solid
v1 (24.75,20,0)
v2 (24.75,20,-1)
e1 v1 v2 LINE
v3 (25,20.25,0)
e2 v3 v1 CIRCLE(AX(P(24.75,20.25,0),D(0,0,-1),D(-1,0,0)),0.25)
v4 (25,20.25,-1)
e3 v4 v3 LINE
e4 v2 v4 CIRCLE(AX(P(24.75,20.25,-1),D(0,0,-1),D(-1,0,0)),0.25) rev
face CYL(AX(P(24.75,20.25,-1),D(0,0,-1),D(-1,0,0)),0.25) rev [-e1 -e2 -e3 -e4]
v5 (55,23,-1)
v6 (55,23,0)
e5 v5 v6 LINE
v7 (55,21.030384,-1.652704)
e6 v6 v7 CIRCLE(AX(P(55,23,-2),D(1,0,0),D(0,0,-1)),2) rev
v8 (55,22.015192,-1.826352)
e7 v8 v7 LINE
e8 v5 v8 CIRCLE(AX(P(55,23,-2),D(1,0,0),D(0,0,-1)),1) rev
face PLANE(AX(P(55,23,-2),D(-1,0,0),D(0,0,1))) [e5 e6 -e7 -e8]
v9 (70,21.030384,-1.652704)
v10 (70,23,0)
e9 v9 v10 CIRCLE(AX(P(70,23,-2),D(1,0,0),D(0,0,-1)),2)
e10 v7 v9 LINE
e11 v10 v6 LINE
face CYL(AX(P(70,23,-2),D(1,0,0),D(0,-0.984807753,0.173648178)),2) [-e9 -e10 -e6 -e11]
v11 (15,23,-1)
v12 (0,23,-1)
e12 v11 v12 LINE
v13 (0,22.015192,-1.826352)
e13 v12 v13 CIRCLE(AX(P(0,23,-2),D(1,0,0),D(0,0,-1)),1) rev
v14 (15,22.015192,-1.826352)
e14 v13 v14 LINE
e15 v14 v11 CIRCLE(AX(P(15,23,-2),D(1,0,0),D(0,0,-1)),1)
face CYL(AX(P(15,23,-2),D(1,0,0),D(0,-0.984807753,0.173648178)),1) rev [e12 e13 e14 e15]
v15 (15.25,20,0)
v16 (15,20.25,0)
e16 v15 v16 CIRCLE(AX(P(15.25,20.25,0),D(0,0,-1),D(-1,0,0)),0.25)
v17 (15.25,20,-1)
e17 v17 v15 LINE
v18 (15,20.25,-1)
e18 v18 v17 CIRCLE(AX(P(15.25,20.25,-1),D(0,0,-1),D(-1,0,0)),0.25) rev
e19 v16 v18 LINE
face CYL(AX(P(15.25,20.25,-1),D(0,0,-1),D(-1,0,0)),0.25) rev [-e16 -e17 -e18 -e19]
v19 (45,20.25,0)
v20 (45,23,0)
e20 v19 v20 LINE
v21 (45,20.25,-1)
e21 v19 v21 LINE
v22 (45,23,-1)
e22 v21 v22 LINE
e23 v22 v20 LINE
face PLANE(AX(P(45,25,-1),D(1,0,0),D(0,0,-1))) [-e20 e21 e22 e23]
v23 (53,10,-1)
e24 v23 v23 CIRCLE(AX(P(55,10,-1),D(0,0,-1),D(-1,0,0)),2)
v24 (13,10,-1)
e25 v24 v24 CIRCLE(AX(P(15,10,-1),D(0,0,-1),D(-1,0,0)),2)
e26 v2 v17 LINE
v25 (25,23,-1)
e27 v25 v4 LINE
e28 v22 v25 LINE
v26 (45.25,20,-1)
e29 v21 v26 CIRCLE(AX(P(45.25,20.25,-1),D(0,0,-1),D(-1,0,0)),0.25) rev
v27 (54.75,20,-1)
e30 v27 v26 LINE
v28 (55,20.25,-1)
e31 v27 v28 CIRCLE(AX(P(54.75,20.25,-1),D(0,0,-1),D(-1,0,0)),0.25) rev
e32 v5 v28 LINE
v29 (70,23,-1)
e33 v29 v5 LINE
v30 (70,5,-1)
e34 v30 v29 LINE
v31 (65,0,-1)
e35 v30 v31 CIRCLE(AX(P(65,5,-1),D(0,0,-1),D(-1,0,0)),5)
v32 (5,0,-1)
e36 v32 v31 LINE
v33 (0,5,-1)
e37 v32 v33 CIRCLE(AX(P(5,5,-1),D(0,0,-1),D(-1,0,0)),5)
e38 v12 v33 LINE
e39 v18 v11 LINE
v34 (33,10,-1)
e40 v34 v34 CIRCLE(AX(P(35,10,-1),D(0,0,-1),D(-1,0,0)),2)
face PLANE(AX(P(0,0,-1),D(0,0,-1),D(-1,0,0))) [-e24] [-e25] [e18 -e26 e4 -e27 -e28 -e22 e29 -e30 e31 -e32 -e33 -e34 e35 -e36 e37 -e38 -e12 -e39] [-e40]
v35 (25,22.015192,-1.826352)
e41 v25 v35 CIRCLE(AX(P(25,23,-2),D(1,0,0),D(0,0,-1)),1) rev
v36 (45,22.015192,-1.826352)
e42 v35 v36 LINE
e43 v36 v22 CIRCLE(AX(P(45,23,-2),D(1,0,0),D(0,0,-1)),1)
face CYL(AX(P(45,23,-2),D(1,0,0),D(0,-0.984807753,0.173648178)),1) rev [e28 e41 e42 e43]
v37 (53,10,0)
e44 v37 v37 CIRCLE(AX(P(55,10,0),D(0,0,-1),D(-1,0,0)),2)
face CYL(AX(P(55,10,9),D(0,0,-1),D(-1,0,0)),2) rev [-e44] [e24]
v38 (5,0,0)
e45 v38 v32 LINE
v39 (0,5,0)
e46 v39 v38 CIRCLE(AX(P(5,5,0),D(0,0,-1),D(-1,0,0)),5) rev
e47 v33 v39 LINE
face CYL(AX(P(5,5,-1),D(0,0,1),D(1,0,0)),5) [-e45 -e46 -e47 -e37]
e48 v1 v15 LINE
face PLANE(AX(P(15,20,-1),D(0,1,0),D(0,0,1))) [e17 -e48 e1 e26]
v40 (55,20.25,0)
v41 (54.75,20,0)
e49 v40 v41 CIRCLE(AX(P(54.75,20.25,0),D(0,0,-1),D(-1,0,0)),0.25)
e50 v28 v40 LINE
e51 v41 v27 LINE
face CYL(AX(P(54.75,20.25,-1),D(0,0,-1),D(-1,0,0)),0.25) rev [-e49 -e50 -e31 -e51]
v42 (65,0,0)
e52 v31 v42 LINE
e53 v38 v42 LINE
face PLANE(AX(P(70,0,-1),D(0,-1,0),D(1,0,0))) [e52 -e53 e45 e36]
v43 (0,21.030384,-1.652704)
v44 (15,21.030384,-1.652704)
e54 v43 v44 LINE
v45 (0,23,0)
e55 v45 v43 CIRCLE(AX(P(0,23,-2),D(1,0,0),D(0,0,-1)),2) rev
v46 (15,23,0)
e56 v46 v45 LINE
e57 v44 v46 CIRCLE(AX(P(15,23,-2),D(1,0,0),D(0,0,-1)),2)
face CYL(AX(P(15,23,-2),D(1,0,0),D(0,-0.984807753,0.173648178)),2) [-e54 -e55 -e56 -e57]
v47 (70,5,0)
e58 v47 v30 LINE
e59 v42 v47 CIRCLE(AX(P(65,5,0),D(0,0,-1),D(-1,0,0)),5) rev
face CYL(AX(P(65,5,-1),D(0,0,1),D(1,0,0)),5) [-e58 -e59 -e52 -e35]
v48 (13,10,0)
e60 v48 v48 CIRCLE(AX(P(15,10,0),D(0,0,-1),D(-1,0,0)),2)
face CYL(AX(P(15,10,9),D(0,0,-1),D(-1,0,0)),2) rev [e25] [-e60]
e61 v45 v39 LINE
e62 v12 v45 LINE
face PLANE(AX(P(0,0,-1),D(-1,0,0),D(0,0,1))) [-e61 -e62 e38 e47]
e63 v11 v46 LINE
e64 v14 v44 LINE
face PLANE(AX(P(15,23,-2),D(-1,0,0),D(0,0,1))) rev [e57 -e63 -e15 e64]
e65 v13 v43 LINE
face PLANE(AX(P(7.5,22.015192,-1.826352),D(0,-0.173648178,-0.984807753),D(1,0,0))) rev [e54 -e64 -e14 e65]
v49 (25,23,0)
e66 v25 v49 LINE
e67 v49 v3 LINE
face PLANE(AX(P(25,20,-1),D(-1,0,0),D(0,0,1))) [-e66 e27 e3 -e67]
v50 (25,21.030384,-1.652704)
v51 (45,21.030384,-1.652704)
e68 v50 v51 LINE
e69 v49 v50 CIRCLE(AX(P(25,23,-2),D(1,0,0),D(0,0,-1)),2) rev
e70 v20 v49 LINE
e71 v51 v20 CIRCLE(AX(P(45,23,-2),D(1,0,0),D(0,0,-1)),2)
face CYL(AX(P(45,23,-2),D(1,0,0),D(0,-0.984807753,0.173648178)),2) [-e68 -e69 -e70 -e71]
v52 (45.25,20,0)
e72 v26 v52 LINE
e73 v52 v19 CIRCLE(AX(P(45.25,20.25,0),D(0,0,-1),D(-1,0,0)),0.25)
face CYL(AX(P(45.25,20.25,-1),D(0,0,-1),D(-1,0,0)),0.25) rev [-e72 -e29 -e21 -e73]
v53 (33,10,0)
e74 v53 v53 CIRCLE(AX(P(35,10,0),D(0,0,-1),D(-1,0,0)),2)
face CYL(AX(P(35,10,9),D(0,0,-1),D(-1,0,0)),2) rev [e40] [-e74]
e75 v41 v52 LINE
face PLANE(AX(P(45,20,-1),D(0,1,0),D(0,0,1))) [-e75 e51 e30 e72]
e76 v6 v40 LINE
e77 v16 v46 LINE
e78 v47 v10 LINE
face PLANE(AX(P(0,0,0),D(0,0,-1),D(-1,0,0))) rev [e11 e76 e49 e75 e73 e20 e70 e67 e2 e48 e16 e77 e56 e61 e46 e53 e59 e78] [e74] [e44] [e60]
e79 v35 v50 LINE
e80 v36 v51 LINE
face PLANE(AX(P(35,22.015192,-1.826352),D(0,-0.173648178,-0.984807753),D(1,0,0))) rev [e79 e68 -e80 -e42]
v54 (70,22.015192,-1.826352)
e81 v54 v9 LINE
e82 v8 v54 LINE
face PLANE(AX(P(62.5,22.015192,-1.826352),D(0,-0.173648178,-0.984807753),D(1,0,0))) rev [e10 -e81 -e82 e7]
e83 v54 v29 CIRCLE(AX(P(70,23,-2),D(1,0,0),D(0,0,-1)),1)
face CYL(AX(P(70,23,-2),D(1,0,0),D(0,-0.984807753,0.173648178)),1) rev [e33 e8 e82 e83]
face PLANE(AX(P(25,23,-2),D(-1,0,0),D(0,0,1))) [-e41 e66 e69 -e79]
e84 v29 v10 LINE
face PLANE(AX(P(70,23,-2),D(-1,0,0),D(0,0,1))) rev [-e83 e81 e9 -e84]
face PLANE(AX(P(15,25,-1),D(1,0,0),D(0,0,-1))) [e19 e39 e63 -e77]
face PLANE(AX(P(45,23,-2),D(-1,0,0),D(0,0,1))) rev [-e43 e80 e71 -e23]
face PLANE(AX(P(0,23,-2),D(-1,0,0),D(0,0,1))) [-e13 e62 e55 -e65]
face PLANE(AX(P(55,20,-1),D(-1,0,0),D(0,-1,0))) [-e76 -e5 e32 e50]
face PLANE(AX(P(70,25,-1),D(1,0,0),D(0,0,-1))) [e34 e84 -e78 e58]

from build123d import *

# Parameters (mm, degrees)
SM_BASE_FLANGE_1_DEPTH = 1
OTHER_1_DEPTH          = 70
OTHER_START            = 25
OTHER_1_2_DEPTH        = 20
OTHER_1_3_DEPTH        = 15
OTHER_START_2          = 55
OTHER_1_4_DEPTH        = 15
SKETCH_12_R            = 2
CUT_EXTRUDE_1_DEPTH    = 10
OTHER_START_3          = -1
OTHER_1_5_DEPTH        = 1
FILLET_1_R             = 0.25
FILLET_2_R             = 5


# Read off the part's stored shape, not the designer's step: 햄1, 코너 자르기1
# Sheet-metal steps are written as plain solids
with BuildPart() as part:
    # Sketch 1 → 베이스-플랜지1 (new body)
    with BuildSketch(Plane.XY):
        Polygon((0, 0), (0, 25), (15, 25), (15, 20), (25, 20), (25, 25), (45, 25), (45, 20), (55, 20), (55, 25), (70, 25), (70, 0), align=None)
    extrude(amount=-SM_BASE_FLANGE_1_DEPTH)

    # Other 1 outline → Other 1 (cut)
    with BuildSketch(Plane.YZ):
        with BuildLine():
            ThreePointArc((23, 0), (24, -0.267949192), (24.732050807, -1))
            Line((24.732050807, -1), (25, -1))
            Line((25, -1), (25, 0))
            Line((25, 0), (23, 0))
        make_face()
    extrude(amount=OTHER_1_DEPTH, mode=Mode.SUBTRACT)

    # Other 1 2 outline → Other 1 2 (add)
    with BuildSketch(Plane.YZ.offset(OTHER_START)):
        with BuildLine():
            Line((22.015192247, -1.826351822), (21.030384494, -1.652703645))
            ThreePointArc((21.030384494, -1.652703645), (23.347296355, -3.969615506), (24.732050807, -1))
            Line((24.732050807, -1), (23, -1))
            ThreePointArc((23, -1), (23.64278761, -2.766044443), (22.015192247, -1.826351822))
        make_face()
    extrude(amount=OTHER_1_2_DEPTH)

    # Other 1 3 outline → Other 1 3 (add)
    with BuildSketch(Plane.YZ):
        with BuildLine():
            Line((22.015192247, -1.826351822), (21.030384494, -1.652703645))
            ThreePointArc((21.030384494, -1.652703645), (23.347296355, -3.969615506), (24.732050807, -1))
            Line((24.732050807, -1), (23, -1))
            ThreePointArc((23, -1), (23.64278761, -2.766044443), (22.015192247, -1.826351822))
        make_face()
    extrude(amount=OTHER_1_3_DEPTH)

    # Other 1 4 outline → Other 1 4 (add)
    with BuildSketch(Plane.YZ.offset(OTHER_START_2)):
        with BuildLine():
            Line((22.015192247, -1.826351822), (21.030384494, -1.652703645))
            ThreePointArc((21.030384494, -1.652703645), (23.347296355, -3.969615506), (24.732050807, -1))
            Line((24.732050807, -1), (23, -1))
            ThreePointArc((23, -1), (23.64278761, -2.766044443), (22.015192247, -1.826351822))
        make_face()
    extrude(amount=OTHER_1_4_DEPTH)

    # 스케치12 → 컷-돌출1 (cut)
    with BuildSketch(Plane(origin=(0, 0, -1), x_dir=(-1, 0, 0), z_dir=(0, 0, -1))):
        with Locations((-35, 10)):
            Circle(SKETCH_12_R)
        with Locations((-55, 10)):
            Circle(SKETCH_12_R)
        with Locations((-15, 10)):
            Circle(SKETCH_12_R)
    extrude(amount=-CUT_EXTRUDE_1_DEPTH, mode=Mode.SUBTRACT)

    # Other 1 5 outline → Other 1 5 (add)
    with BuildSketch(Plane.XY.offset(OTHER_START_3)):
        with BuildLine():
            Line((45, 20), (45.25, 20))
            ThreePointArc((45.25, 20), (45.073223305, 20.073223305), (45, 20.25))
            Line((45, 20.25), (45, 20))
        make_face()
        with BuildLine():
            ThreePointArc((55, 20.25), (54.926776695, 20.073223305), (54.75, 20))
            Line((54.75, 20), (55, 20))
            Line((55, 20), (55, 20.25))
        make_face()
    extrude(amount=OTHER_1_5_DEPTH)

    # 필렛1
    fillet_1_edges = [part.edges().sort_by_distance(p)[0] for p in [
        (15, 20, -0.5),
        (25, 20, -0.5),
    ]]
    fillet(fillet_1_edges, radius=FILLET_1_R)

    # 필렛2
    fillet_2_edges = [part.edges().sort_by_distance(p)[0] for p in [
        (0, 0, -0.5),
        (70, 0, -0.5),
    ]]
    fillet(fillet_2_edges, radius=FILLET_2_R)


solid = part.part
